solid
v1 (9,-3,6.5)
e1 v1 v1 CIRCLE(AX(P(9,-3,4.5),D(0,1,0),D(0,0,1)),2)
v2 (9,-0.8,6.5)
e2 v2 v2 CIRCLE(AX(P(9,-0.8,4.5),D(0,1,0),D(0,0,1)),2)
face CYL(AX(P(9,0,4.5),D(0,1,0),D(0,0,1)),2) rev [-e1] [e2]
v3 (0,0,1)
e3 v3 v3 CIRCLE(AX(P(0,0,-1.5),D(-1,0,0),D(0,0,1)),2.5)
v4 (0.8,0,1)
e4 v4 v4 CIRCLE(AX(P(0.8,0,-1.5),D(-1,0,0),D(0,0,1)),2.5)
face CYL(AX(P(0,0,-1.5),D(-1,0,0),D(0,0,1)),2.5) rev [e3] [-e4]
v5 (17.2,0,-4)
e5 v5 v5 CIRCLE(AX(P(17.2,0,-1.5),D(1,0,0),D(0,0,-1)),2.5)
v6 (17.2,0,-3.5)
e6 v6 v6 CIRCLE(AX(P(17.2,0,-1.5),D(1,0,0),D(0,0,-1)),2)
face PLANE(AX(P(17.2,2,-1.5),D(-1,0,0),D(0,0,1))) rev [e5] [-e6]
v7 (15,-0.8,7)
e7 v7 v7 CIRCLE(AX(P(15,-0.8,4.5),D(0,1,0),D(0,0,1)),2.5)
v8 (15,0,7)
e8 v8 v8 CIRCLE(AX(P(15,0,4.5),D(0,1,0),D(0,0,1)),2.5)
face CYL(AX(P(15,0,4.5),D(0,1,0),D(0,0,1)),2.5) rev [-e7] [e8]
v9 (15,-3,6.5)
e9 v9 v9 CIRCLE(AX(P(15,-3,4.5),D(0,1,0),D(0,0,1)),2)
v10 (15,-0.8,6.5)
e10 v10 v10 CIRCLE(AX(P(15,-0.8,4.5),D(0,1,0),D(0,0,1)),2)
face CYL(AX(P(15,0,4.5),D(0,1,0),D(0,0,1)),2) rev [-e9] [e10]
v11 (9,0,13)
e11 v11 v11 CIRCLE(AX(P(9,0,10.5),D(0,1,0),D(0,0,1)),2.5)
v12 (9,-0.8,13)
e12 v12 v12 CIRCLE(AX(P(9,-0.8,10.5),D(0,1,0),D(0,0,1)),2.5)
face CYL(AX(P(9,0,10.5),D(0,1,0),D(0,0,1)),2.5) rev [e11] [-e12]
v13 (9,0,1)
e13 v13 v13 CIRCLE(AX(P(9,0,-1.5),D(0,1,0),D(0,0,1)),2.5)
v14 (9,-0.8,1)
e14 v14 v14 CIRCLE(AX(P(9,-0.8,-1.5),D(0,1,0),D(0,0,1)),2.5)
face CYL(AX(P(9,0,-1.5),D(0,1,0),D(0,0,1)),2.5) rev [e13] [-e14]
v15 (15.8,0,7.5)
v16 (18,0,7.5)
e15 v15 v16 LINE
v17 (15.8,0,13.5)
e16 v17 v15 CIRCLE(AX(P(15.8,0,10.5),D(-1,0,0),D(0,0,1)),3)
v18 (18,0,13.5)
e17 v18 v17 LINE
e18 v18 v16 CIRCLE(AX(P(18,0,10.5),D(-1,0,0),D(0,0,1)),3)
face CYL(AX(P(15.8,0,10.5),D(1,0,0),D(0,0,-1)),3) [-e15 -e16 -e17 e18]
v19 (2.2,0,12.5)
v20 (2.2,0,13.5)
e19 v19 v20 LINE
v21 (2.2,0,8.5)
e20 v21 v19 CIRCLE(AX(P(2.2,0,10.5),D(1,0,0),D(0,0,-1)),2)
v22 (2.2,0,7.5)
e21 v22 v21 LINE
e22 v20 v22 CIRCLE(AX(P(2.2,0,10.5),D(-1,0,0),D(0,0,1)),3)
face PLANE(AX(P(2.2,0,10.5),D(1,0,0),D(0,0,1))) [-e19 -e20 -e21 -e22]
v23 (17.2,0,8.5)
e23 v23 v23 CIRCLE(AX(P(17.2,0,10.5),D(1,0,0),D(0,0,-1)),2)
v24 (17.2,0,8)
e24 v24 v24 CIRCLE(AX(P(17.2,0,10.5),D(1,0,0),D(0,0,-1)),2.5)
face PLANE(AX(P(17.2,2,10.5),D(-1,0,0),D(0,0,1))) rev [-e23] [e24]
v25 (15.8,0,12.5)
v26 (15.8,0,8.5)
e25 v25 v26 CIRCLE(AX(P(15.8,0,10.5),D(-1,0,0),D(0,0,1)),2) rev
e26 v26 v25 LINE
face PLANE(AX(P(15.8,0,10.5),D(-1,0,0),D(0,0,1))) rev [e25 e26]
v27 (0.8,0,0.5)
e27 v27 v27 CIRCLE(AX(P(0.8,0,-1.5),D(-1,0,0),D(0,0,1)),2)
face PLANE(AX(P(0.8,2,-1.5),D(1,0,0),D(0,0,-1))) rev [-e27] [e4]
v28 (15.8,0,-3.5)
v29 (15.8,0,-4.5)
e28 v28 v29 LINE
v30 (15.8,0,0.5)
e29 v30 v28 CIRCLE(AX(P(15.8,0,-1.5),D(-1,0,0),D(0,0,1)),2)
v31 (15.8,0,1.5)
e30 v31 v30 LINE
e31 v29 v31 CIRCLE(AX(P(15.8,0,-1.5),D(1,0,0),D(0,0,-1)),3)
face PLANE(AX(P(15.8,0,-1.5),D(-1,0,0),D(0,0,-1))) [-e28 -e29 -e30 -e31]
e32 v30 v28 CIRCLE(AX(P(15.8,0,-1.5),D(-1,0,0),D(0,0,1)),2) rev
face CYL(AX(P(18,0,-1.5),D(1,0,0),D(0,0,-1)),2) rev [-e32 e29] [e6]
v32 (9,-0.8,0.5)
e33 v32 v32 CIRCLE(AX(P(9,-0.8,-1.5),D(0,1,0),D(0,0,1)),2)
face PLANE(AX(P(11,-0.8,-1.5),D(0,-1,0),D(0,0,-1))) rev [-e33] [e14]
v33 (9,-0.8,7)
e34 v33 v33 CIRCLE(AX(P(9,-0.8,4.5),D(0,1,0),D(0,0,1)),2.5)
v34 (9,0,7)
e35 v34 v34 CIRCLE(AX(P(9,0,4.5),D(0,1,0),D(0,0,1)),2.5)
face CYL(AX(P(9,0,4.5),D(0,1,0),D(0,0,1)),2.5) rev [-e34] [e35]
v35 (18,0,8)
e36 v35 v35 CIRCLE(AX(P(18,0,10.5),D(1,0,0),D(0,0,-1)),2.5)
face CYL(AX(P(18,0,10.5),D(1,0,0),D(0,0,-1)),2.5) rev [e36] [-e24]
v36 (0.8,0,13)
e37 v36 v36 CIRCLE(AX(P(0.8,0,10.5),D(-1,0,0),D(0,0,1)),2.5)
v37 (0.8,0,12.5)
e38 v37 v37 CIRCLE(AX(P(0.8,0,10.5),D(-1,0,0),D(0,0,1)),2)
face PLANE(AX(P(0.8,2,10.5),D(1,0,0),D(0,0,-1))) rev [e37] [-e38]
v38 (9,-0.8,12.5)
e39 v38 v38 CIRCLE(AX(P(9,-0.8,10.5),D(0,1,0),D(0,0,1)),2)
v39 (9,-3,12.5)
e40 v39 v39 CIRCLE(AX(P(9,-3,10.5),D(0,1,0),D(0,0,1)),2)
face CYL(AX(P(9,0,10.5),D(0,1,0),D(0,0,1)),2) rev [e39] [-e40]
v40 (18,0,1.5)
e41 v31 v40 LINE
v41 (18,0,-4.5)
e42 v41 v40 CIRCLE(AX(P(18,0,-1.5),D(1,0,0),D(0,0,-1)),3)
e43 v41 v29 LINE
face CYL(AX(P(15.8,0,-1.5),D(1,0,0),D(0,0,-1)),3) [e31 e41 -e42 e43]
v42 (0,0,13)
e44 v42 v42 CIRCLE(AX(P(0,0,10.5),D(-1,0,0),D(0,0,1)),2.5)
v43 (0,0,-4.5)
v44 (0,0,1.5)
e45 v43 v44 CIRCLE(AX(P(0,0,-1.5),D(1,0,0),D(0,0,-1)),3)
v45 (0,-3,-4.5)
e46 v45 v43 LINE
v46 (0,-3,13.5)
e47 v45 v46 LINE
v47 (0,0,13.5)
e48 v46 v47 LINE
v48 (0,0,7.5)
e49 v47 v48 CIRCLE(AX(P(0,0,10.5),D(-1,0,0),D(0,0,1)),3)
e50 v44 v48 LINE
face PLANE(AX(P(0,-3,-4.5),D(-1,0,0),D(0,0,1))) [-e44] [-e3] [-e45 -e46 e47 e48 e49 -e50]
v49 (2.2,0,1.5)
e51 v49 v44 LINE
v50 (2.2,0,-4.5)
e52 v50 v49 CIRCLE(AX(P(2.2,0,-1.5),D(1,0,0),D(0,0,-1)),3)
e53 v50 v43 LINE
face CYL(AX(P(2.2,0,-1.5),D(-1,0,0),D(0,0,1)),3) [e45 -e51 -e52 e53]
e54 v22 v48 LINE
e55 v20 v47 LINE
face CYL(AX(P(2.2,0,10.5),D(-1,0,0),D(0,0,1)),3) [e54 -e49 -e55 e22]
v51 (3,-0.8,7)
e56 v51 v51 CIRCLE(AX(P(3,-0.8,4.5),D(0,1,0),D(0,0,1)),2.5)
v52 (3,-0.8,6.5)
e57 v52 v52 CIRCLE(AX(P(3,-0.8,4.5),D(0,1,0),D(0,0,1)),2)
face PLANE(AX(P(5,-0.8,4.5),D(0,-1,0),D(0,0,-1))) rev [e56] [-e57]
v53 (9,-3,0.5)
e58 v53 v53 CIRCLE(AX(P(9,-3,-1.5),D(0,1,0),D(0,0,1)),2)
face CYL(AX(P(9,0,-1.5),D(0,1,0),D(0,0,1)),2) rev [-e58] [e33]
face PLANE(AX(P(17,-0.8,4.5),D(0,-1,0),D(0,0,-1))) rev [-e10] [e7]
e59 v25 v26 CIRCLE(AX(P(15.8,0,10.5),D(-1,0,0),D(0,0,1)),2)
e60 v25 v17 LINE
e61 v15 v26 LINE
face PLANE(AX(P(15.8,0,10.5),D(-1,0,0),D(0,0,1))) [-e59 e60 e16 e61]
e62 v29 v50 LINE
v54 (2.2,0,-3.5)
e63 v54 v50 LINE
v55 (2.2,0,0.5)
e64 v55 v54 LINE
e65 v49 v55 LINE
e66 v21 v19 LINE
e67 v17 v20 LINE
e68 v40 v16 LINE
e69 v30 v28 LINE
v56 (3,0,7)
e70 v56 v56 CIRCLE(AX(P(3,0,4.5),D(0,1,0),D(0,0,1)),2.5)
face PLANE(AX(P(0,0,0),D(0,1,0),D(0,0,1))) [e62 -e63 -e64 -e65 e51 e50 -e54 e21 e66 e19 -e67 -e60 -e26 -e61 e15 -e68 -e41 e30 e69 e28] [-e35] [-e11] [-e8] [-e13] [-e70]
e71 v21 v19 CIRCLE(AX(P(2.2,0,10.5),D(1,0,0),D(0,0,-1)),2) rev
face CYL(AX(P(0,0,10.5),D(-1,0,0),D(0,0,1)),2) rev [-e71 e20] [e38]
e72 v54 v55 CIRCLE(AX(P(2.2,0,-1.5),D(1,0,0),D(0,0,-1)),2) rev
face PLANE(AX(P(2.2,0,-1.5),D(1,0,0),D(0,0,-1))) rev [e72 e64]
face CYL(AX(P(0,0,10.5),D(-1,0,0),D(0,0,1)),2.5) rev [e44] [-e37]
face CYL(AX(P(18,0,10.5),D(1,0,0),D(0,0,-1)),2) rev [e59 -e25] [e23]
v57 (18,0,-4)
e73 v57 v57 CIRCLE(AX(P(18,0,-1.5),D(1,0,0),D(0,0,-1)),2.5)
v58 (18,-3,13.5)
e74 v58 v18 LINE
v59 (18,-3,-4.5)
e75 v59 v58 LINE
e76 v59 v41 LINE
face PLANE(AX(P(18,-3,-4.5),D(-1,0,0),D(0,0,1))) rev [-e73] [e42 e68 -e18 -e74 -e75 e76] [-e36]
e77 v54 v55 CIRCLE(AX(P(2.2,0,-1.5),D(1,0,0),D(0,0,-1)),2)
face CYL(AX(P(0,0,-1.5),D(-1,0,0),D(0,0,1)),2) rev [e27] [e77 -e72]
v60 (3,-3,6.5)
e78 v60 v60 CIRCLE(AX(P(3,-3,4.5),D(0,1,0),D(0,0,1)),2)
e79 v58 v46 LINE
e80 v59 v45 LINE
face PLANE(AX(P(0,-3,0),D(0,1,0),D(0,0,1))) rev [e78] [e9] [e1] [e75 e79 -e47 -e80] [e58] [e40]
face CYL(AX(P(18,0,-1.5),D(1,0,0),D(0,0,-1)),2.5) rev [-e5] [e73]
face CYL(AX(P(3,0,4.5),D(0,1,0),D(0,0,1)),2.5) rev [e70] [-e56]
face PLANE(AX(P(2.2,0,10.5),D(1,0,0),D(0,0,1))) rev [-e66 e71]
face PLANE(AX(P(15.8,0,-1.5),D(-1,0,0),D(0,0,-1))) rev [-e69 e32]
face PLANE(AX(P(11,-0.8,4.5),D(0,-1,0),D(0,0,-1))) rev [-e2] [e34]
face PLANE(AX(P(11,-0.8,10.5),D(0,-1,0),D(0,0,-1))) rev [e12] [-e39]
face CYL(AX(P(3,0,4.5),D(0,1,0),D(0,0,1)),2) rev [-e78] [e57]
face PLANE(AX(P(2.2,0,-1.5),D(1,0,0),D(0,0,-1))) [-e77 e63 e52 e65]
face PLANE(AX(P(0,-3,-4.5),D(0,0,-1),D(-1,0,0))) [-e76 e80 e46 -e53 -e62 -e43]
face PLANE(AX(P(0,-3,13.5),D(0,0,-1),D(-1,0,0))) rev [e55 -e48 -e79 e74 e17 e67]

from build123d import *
from build123d.topology import SkipClean

# Parameters (mm, degrees)
SKETCH1_W                  = 9
SKETCH1_H                  = 9
BOSS_EXTRUDE1_DEPTH        = 3
HOLE1_AT_2_COUNT           = 2
HOLE1_AT_2_PITCH           = 6
HOLE1_AT_3_COUNT           = 2
HOLE1_AT_3_PITCH           = 6
BOSS_EXTRUDE2_DEPTH        = 2.2
HOLE2_D                    = 4
HOLE2_DEPTH                = 2.2
HOLE2_CBORE_D              = 5
HOLE2_CBORE_DEPTH          = 0.8
MIRROR2_COPY_3_SKETCH_W    = 9
MIRROR2_COPY_3_SKETCH_H    = 9
MIRROR2_COPY_3_DEPTH       = 3
MIRROR2_COPY_5_DEPTH       = 2.2
MIRROR2_COPY_6_D           = 4
MIRROR2_COPY_6_DEPTH       = 2.2
MIRROR2_COPY_6_CBORE_D     = 5
MIRROR2_COPY_6_CBORE_DEPTH = 0.8


with BuildPart() as part:
    # Sketch1 → Boss-Extrude1 (new body)
    with BuildSketch(Plane(origin=(0, 0, 0), x_dir=(1, 0, 0), z_dir=(0, 1, 0))):
        with Locations((4.5, 0)):
            Rectangle(SKETCH1_W, SKETCH1_H)
    boss_extrude1 = extrude(amount=-BOSS_EXTRUDE1_DEPTH)

    # Sketch5 → Hole1 (revolve, cut)
    with BuildSketch(Plane(origin=(9, 0, 4.5), x_dir=(0, 0, 1), z_dir=(1, 0, 0))):
        Polygon((0, 0), (0, 4.201721238), (2, 3), (2, 0.8), (2.5, 0.8), (2.5, 0), align=None)
    hole1 = revolve(axis=Axis((9, 11.310875039, 4.5), (0, -1, 0)), mode=Mode.SUBTRACT)

    # Hole1 at 2: Hole1 ×2
    with Locations(*[(0, 0, -i * HOLE1_AT_2_PITCH) for i in range(1, HOLE1_AT_2_COUNT)]):
        add(hole1, mode=Mode.SUBTRACT)

    # Hole1 at 3: Hole1 ×2
    with Locations(*[(-i * HOLE1_AT_3_PITCH, 0, 0) for i in range(1, HOLE1_AT_3_COUNT)]):
        add(hole1, mode=Mode.SUBTRACT)

    # Sketch6 → Boss-Extrude2 (add)
    with BuildSketch(Plane(origin=(0, 0, 0), x_dir=(0, 0, -1), z_dir=(1, 0, 0))):
        with BuildLine():
            Line((4.5, 0), (-1.5, 0))
            ThreePointArc((-1.5, 0), (1.5, 3), (4.5, 0))
        make_face()
    boss_extrude2 = extrude(amount=BOSS_EXTRUDE2_DEPTH)

    # Hole2
    with Locations(Plane.ZY):
        with Locations((-1.5, 0)):
            hole2 = CounterBoreHole(HOLE2_D / 2, HOLE2_CBORE_D / 2, HOLE2_CBORE_DEPTH, depth=HOLE2_DEPTH)

    # Mirror1: Boss-Extrude1, Hole1, Boss-Extrude2, Hole2 across plane
    add(boss_extrude1.mirror(Plane.XY.offset(4.5)))
    add(hole1.mirror(Plane.XY.offset(4.5)), mode=Mode.SUBTRACT)
    add(boss_extrude2.mirror(Plane.XY.offset(4.5)))
    add(hole2.mirror(Plane.XY.offset(4.5)), mode=Mode.SUBTRACT)

    # Mirror1 copy 1 sketch → Mirror1 copy 1 (revolve, cut)
    with BuildSketch(Plane(origin=(9, 0, 10.5), x_dir=(0, 0, -1), z_dir=(1, 0, 0))):
        Polygon((0, 0), (0, -4.201721238), (2, -3), (2, -0.8), (2.5, -0.8), (2.5, 0), align=None)
    revolve(axis=Axis((9, 11.310875039, 10.5), (0, 1, 0)), mode=Mode.SUBTRACT)

    # Mirror1 copy 2 sketch → Mirror1 copy 2 (revolve, cut)
    with BuildSketch(Plane(origin=(3, 0, 4.5), x_dir=(0, 0, -1), z_dir=(1, 0, 0))):
        Polygon((0, 0), (0, -4.201721238), (2, -3), (2, -0.8), (2.5, -0.8), (2.5, 0), align=None)
    revolve(axis=Axis((3, 11.310875039, 4.5), (0, 1, 0)), mode=Mode.SUBTRACT)

    # Mirror2: Boss-Extrude1, Hole1, Boss-Extrude2, Hole2 across plane
    with SkipClean():  # the faces are left unmerged after this step: merging them gives an invalid solid
        add(boss_extrude1.mirror(Plane(origin=(9, 0, 0), x_dir=(0, 0, 1), z_dir=(1, 0, 0))))
        add(hole1.mirror(Plane(origin=(9, 0, 0), x_dir=(0, 0, 1), z_dir=(1, 0, 0))), mode=Mode.SUBTRACT)
        add(boss_extrude2.mirror(Plane(origin=(9, 0, 0), x_dir=(0, 0, 1), z_dir=(1, 0, 0))))
        add(hole2.mirror(Plane(origin=(9, 0, 0), x_dir=(0, 0, 1), z_dir=(1, 0, 0))), mode=Mode.SUBTRACT)

    # Mirror2 copy 1 sketch → Mirror2 copy 1 (revolve, cut)
    with SkipClean():  # the faces are left unmerged after this step: merging them gives an invalid solid
        with BuildSketch(Plane(origin=(9, 0, -1.5), x_dir=(0, 0, 1), z_dir=(-1, 0, 0))):
            Polygon((0, 0), (0, -4.201721238), (2, -3), (2, -0.8), (2.5, -0.8), (2.5, 0), align=None)
        revolve(axis=Axis((9, 11.310875039, -1.5), (0, 1, 0)), mode=Mode.SUBTRACT)
    add(part.part.scale(1), mode=Mode.REPLACE)  # the faces are merged on a copy

    # Mirror2 copy 2 sketch → Mirror2 copy 2 (revolve, cut)
    with BuildSketch(Plane(origin=(15, 0, 4.5), x_dir=(0, 0, 1), z_dir=(-1, 0, 0))):
        Polygon((0, 0), (0, -4.201721238), (2, -3), (2, -0.8), (2.5, -0.8), (2.5, 0), align=None)
    revolve(axis=Axis((15, 11.310875039, 4.5), (0, 1, 0)), mode=Mode.SUBTRACT)

    # Mirror2 copy 3 sketch → Mirror2 copy 3 (add)
    with BuildSketch(Plane(origin=(18, 0, 9), x_dir=(-1, 0, 0), z_dir=(0, 1, 0))):
        with Locations((4.5, 0)):
            Rectangle(MIRROR2_COPY_3_SKETCH_W, MIRROR2_COPY_3_SKETCH_H)
    extrude(amount=-MIRROR2_COPY_3_DEPTH)

    # Mirror2 copy 4 sketch → Mirror2 copy 4 (revolve, cut)
    with BuildSketch(Plane(origin=(9, 0, 4.5), x_dir=(0, 0, -1), z_dir=(-1, 0, 0))):
        Polygon((0, 0), (0, 4.201721238), (2, 3), (2, 0.8), (2.5, 0.8), (2.5, 0), align=None)
    revolve(axis=Axis((9, 11.310875039, 4.5), (0, -1, 0)), mode=Mode.SUBTRACT)

    # Mirror2 copy 5 sketch → Mirror2 copy 5 (add)
    with BuildSketch(Plane(origin=(18, 0, 9), x_dir=(0, 0, 1), z_dir=(-1, 0, 0))):
        with BuildLine():
            Line((4.5, 0), (-1.5, 0))
            ThreePointArc((-1.5, 0), (1.5, 3), (4.5, 0))
        make_face()
    extrude(amount=MIRROR2_COPY_5_DEPTH)

    # Mirror2 copy 6
    with Locations(Plane(origin=(18, 0, 9), x_dir=(0, 0, -1), z_dir=(1, 0, 0))):
        with Locations((-1.5, 0)):
            CounterBoreHole(MIRROR2_COPY_6_D / 2, MIRROR2_COPY_6_CBORE_D / 2, MIRROR2_COPY_6_CBORE_DEPTH, depth=MIRROR2_COPY_6_DEPTH)

    # Mirror2 copy 7 sketch → Mirror2 copy 7 (revolve, cut)
    with BuildSketch(Plane(origin=(9, 0, 10.5), x_dir=(0, 0, -1), z_dir=(-1, 0, 0))):
        Polygon((0, 0), (0, 4.201721238), (2, 3), (2, 0.8), (2.5, 0.8), (2.5, 0), align=None)
    revolve(axis=Axis((9, 11.310875039, 10.5), (0, -1, 0)), mode=Mode.SUBTRACT)

    # Mirror2 copy 8 sketch → Mirror2 copy 8 (revolve, cut)
    with SkipClean():  # the faces are left unmerged after this step: merging them gives an invalid solid
        with BuildSketch(Plane(origin=(15, 0, 4.5), x_dir=(0, 0, -1), z_dir=(-1, 0, 0))):
            Polygon((0, 0), (0, 4.201721238), (2, 3), (2, 0.8), (2.5, 0.8), (2.5, 0), align=None)
        revolve(axis=Axis((15, 11.310875039, 4.5), (0, -1, 0)), mode=Mode.SUBTRACT)
    add(part.part.scale(1), mode=Mode.REPLACE)  # the faces are merged on a copy


solid = part.part
